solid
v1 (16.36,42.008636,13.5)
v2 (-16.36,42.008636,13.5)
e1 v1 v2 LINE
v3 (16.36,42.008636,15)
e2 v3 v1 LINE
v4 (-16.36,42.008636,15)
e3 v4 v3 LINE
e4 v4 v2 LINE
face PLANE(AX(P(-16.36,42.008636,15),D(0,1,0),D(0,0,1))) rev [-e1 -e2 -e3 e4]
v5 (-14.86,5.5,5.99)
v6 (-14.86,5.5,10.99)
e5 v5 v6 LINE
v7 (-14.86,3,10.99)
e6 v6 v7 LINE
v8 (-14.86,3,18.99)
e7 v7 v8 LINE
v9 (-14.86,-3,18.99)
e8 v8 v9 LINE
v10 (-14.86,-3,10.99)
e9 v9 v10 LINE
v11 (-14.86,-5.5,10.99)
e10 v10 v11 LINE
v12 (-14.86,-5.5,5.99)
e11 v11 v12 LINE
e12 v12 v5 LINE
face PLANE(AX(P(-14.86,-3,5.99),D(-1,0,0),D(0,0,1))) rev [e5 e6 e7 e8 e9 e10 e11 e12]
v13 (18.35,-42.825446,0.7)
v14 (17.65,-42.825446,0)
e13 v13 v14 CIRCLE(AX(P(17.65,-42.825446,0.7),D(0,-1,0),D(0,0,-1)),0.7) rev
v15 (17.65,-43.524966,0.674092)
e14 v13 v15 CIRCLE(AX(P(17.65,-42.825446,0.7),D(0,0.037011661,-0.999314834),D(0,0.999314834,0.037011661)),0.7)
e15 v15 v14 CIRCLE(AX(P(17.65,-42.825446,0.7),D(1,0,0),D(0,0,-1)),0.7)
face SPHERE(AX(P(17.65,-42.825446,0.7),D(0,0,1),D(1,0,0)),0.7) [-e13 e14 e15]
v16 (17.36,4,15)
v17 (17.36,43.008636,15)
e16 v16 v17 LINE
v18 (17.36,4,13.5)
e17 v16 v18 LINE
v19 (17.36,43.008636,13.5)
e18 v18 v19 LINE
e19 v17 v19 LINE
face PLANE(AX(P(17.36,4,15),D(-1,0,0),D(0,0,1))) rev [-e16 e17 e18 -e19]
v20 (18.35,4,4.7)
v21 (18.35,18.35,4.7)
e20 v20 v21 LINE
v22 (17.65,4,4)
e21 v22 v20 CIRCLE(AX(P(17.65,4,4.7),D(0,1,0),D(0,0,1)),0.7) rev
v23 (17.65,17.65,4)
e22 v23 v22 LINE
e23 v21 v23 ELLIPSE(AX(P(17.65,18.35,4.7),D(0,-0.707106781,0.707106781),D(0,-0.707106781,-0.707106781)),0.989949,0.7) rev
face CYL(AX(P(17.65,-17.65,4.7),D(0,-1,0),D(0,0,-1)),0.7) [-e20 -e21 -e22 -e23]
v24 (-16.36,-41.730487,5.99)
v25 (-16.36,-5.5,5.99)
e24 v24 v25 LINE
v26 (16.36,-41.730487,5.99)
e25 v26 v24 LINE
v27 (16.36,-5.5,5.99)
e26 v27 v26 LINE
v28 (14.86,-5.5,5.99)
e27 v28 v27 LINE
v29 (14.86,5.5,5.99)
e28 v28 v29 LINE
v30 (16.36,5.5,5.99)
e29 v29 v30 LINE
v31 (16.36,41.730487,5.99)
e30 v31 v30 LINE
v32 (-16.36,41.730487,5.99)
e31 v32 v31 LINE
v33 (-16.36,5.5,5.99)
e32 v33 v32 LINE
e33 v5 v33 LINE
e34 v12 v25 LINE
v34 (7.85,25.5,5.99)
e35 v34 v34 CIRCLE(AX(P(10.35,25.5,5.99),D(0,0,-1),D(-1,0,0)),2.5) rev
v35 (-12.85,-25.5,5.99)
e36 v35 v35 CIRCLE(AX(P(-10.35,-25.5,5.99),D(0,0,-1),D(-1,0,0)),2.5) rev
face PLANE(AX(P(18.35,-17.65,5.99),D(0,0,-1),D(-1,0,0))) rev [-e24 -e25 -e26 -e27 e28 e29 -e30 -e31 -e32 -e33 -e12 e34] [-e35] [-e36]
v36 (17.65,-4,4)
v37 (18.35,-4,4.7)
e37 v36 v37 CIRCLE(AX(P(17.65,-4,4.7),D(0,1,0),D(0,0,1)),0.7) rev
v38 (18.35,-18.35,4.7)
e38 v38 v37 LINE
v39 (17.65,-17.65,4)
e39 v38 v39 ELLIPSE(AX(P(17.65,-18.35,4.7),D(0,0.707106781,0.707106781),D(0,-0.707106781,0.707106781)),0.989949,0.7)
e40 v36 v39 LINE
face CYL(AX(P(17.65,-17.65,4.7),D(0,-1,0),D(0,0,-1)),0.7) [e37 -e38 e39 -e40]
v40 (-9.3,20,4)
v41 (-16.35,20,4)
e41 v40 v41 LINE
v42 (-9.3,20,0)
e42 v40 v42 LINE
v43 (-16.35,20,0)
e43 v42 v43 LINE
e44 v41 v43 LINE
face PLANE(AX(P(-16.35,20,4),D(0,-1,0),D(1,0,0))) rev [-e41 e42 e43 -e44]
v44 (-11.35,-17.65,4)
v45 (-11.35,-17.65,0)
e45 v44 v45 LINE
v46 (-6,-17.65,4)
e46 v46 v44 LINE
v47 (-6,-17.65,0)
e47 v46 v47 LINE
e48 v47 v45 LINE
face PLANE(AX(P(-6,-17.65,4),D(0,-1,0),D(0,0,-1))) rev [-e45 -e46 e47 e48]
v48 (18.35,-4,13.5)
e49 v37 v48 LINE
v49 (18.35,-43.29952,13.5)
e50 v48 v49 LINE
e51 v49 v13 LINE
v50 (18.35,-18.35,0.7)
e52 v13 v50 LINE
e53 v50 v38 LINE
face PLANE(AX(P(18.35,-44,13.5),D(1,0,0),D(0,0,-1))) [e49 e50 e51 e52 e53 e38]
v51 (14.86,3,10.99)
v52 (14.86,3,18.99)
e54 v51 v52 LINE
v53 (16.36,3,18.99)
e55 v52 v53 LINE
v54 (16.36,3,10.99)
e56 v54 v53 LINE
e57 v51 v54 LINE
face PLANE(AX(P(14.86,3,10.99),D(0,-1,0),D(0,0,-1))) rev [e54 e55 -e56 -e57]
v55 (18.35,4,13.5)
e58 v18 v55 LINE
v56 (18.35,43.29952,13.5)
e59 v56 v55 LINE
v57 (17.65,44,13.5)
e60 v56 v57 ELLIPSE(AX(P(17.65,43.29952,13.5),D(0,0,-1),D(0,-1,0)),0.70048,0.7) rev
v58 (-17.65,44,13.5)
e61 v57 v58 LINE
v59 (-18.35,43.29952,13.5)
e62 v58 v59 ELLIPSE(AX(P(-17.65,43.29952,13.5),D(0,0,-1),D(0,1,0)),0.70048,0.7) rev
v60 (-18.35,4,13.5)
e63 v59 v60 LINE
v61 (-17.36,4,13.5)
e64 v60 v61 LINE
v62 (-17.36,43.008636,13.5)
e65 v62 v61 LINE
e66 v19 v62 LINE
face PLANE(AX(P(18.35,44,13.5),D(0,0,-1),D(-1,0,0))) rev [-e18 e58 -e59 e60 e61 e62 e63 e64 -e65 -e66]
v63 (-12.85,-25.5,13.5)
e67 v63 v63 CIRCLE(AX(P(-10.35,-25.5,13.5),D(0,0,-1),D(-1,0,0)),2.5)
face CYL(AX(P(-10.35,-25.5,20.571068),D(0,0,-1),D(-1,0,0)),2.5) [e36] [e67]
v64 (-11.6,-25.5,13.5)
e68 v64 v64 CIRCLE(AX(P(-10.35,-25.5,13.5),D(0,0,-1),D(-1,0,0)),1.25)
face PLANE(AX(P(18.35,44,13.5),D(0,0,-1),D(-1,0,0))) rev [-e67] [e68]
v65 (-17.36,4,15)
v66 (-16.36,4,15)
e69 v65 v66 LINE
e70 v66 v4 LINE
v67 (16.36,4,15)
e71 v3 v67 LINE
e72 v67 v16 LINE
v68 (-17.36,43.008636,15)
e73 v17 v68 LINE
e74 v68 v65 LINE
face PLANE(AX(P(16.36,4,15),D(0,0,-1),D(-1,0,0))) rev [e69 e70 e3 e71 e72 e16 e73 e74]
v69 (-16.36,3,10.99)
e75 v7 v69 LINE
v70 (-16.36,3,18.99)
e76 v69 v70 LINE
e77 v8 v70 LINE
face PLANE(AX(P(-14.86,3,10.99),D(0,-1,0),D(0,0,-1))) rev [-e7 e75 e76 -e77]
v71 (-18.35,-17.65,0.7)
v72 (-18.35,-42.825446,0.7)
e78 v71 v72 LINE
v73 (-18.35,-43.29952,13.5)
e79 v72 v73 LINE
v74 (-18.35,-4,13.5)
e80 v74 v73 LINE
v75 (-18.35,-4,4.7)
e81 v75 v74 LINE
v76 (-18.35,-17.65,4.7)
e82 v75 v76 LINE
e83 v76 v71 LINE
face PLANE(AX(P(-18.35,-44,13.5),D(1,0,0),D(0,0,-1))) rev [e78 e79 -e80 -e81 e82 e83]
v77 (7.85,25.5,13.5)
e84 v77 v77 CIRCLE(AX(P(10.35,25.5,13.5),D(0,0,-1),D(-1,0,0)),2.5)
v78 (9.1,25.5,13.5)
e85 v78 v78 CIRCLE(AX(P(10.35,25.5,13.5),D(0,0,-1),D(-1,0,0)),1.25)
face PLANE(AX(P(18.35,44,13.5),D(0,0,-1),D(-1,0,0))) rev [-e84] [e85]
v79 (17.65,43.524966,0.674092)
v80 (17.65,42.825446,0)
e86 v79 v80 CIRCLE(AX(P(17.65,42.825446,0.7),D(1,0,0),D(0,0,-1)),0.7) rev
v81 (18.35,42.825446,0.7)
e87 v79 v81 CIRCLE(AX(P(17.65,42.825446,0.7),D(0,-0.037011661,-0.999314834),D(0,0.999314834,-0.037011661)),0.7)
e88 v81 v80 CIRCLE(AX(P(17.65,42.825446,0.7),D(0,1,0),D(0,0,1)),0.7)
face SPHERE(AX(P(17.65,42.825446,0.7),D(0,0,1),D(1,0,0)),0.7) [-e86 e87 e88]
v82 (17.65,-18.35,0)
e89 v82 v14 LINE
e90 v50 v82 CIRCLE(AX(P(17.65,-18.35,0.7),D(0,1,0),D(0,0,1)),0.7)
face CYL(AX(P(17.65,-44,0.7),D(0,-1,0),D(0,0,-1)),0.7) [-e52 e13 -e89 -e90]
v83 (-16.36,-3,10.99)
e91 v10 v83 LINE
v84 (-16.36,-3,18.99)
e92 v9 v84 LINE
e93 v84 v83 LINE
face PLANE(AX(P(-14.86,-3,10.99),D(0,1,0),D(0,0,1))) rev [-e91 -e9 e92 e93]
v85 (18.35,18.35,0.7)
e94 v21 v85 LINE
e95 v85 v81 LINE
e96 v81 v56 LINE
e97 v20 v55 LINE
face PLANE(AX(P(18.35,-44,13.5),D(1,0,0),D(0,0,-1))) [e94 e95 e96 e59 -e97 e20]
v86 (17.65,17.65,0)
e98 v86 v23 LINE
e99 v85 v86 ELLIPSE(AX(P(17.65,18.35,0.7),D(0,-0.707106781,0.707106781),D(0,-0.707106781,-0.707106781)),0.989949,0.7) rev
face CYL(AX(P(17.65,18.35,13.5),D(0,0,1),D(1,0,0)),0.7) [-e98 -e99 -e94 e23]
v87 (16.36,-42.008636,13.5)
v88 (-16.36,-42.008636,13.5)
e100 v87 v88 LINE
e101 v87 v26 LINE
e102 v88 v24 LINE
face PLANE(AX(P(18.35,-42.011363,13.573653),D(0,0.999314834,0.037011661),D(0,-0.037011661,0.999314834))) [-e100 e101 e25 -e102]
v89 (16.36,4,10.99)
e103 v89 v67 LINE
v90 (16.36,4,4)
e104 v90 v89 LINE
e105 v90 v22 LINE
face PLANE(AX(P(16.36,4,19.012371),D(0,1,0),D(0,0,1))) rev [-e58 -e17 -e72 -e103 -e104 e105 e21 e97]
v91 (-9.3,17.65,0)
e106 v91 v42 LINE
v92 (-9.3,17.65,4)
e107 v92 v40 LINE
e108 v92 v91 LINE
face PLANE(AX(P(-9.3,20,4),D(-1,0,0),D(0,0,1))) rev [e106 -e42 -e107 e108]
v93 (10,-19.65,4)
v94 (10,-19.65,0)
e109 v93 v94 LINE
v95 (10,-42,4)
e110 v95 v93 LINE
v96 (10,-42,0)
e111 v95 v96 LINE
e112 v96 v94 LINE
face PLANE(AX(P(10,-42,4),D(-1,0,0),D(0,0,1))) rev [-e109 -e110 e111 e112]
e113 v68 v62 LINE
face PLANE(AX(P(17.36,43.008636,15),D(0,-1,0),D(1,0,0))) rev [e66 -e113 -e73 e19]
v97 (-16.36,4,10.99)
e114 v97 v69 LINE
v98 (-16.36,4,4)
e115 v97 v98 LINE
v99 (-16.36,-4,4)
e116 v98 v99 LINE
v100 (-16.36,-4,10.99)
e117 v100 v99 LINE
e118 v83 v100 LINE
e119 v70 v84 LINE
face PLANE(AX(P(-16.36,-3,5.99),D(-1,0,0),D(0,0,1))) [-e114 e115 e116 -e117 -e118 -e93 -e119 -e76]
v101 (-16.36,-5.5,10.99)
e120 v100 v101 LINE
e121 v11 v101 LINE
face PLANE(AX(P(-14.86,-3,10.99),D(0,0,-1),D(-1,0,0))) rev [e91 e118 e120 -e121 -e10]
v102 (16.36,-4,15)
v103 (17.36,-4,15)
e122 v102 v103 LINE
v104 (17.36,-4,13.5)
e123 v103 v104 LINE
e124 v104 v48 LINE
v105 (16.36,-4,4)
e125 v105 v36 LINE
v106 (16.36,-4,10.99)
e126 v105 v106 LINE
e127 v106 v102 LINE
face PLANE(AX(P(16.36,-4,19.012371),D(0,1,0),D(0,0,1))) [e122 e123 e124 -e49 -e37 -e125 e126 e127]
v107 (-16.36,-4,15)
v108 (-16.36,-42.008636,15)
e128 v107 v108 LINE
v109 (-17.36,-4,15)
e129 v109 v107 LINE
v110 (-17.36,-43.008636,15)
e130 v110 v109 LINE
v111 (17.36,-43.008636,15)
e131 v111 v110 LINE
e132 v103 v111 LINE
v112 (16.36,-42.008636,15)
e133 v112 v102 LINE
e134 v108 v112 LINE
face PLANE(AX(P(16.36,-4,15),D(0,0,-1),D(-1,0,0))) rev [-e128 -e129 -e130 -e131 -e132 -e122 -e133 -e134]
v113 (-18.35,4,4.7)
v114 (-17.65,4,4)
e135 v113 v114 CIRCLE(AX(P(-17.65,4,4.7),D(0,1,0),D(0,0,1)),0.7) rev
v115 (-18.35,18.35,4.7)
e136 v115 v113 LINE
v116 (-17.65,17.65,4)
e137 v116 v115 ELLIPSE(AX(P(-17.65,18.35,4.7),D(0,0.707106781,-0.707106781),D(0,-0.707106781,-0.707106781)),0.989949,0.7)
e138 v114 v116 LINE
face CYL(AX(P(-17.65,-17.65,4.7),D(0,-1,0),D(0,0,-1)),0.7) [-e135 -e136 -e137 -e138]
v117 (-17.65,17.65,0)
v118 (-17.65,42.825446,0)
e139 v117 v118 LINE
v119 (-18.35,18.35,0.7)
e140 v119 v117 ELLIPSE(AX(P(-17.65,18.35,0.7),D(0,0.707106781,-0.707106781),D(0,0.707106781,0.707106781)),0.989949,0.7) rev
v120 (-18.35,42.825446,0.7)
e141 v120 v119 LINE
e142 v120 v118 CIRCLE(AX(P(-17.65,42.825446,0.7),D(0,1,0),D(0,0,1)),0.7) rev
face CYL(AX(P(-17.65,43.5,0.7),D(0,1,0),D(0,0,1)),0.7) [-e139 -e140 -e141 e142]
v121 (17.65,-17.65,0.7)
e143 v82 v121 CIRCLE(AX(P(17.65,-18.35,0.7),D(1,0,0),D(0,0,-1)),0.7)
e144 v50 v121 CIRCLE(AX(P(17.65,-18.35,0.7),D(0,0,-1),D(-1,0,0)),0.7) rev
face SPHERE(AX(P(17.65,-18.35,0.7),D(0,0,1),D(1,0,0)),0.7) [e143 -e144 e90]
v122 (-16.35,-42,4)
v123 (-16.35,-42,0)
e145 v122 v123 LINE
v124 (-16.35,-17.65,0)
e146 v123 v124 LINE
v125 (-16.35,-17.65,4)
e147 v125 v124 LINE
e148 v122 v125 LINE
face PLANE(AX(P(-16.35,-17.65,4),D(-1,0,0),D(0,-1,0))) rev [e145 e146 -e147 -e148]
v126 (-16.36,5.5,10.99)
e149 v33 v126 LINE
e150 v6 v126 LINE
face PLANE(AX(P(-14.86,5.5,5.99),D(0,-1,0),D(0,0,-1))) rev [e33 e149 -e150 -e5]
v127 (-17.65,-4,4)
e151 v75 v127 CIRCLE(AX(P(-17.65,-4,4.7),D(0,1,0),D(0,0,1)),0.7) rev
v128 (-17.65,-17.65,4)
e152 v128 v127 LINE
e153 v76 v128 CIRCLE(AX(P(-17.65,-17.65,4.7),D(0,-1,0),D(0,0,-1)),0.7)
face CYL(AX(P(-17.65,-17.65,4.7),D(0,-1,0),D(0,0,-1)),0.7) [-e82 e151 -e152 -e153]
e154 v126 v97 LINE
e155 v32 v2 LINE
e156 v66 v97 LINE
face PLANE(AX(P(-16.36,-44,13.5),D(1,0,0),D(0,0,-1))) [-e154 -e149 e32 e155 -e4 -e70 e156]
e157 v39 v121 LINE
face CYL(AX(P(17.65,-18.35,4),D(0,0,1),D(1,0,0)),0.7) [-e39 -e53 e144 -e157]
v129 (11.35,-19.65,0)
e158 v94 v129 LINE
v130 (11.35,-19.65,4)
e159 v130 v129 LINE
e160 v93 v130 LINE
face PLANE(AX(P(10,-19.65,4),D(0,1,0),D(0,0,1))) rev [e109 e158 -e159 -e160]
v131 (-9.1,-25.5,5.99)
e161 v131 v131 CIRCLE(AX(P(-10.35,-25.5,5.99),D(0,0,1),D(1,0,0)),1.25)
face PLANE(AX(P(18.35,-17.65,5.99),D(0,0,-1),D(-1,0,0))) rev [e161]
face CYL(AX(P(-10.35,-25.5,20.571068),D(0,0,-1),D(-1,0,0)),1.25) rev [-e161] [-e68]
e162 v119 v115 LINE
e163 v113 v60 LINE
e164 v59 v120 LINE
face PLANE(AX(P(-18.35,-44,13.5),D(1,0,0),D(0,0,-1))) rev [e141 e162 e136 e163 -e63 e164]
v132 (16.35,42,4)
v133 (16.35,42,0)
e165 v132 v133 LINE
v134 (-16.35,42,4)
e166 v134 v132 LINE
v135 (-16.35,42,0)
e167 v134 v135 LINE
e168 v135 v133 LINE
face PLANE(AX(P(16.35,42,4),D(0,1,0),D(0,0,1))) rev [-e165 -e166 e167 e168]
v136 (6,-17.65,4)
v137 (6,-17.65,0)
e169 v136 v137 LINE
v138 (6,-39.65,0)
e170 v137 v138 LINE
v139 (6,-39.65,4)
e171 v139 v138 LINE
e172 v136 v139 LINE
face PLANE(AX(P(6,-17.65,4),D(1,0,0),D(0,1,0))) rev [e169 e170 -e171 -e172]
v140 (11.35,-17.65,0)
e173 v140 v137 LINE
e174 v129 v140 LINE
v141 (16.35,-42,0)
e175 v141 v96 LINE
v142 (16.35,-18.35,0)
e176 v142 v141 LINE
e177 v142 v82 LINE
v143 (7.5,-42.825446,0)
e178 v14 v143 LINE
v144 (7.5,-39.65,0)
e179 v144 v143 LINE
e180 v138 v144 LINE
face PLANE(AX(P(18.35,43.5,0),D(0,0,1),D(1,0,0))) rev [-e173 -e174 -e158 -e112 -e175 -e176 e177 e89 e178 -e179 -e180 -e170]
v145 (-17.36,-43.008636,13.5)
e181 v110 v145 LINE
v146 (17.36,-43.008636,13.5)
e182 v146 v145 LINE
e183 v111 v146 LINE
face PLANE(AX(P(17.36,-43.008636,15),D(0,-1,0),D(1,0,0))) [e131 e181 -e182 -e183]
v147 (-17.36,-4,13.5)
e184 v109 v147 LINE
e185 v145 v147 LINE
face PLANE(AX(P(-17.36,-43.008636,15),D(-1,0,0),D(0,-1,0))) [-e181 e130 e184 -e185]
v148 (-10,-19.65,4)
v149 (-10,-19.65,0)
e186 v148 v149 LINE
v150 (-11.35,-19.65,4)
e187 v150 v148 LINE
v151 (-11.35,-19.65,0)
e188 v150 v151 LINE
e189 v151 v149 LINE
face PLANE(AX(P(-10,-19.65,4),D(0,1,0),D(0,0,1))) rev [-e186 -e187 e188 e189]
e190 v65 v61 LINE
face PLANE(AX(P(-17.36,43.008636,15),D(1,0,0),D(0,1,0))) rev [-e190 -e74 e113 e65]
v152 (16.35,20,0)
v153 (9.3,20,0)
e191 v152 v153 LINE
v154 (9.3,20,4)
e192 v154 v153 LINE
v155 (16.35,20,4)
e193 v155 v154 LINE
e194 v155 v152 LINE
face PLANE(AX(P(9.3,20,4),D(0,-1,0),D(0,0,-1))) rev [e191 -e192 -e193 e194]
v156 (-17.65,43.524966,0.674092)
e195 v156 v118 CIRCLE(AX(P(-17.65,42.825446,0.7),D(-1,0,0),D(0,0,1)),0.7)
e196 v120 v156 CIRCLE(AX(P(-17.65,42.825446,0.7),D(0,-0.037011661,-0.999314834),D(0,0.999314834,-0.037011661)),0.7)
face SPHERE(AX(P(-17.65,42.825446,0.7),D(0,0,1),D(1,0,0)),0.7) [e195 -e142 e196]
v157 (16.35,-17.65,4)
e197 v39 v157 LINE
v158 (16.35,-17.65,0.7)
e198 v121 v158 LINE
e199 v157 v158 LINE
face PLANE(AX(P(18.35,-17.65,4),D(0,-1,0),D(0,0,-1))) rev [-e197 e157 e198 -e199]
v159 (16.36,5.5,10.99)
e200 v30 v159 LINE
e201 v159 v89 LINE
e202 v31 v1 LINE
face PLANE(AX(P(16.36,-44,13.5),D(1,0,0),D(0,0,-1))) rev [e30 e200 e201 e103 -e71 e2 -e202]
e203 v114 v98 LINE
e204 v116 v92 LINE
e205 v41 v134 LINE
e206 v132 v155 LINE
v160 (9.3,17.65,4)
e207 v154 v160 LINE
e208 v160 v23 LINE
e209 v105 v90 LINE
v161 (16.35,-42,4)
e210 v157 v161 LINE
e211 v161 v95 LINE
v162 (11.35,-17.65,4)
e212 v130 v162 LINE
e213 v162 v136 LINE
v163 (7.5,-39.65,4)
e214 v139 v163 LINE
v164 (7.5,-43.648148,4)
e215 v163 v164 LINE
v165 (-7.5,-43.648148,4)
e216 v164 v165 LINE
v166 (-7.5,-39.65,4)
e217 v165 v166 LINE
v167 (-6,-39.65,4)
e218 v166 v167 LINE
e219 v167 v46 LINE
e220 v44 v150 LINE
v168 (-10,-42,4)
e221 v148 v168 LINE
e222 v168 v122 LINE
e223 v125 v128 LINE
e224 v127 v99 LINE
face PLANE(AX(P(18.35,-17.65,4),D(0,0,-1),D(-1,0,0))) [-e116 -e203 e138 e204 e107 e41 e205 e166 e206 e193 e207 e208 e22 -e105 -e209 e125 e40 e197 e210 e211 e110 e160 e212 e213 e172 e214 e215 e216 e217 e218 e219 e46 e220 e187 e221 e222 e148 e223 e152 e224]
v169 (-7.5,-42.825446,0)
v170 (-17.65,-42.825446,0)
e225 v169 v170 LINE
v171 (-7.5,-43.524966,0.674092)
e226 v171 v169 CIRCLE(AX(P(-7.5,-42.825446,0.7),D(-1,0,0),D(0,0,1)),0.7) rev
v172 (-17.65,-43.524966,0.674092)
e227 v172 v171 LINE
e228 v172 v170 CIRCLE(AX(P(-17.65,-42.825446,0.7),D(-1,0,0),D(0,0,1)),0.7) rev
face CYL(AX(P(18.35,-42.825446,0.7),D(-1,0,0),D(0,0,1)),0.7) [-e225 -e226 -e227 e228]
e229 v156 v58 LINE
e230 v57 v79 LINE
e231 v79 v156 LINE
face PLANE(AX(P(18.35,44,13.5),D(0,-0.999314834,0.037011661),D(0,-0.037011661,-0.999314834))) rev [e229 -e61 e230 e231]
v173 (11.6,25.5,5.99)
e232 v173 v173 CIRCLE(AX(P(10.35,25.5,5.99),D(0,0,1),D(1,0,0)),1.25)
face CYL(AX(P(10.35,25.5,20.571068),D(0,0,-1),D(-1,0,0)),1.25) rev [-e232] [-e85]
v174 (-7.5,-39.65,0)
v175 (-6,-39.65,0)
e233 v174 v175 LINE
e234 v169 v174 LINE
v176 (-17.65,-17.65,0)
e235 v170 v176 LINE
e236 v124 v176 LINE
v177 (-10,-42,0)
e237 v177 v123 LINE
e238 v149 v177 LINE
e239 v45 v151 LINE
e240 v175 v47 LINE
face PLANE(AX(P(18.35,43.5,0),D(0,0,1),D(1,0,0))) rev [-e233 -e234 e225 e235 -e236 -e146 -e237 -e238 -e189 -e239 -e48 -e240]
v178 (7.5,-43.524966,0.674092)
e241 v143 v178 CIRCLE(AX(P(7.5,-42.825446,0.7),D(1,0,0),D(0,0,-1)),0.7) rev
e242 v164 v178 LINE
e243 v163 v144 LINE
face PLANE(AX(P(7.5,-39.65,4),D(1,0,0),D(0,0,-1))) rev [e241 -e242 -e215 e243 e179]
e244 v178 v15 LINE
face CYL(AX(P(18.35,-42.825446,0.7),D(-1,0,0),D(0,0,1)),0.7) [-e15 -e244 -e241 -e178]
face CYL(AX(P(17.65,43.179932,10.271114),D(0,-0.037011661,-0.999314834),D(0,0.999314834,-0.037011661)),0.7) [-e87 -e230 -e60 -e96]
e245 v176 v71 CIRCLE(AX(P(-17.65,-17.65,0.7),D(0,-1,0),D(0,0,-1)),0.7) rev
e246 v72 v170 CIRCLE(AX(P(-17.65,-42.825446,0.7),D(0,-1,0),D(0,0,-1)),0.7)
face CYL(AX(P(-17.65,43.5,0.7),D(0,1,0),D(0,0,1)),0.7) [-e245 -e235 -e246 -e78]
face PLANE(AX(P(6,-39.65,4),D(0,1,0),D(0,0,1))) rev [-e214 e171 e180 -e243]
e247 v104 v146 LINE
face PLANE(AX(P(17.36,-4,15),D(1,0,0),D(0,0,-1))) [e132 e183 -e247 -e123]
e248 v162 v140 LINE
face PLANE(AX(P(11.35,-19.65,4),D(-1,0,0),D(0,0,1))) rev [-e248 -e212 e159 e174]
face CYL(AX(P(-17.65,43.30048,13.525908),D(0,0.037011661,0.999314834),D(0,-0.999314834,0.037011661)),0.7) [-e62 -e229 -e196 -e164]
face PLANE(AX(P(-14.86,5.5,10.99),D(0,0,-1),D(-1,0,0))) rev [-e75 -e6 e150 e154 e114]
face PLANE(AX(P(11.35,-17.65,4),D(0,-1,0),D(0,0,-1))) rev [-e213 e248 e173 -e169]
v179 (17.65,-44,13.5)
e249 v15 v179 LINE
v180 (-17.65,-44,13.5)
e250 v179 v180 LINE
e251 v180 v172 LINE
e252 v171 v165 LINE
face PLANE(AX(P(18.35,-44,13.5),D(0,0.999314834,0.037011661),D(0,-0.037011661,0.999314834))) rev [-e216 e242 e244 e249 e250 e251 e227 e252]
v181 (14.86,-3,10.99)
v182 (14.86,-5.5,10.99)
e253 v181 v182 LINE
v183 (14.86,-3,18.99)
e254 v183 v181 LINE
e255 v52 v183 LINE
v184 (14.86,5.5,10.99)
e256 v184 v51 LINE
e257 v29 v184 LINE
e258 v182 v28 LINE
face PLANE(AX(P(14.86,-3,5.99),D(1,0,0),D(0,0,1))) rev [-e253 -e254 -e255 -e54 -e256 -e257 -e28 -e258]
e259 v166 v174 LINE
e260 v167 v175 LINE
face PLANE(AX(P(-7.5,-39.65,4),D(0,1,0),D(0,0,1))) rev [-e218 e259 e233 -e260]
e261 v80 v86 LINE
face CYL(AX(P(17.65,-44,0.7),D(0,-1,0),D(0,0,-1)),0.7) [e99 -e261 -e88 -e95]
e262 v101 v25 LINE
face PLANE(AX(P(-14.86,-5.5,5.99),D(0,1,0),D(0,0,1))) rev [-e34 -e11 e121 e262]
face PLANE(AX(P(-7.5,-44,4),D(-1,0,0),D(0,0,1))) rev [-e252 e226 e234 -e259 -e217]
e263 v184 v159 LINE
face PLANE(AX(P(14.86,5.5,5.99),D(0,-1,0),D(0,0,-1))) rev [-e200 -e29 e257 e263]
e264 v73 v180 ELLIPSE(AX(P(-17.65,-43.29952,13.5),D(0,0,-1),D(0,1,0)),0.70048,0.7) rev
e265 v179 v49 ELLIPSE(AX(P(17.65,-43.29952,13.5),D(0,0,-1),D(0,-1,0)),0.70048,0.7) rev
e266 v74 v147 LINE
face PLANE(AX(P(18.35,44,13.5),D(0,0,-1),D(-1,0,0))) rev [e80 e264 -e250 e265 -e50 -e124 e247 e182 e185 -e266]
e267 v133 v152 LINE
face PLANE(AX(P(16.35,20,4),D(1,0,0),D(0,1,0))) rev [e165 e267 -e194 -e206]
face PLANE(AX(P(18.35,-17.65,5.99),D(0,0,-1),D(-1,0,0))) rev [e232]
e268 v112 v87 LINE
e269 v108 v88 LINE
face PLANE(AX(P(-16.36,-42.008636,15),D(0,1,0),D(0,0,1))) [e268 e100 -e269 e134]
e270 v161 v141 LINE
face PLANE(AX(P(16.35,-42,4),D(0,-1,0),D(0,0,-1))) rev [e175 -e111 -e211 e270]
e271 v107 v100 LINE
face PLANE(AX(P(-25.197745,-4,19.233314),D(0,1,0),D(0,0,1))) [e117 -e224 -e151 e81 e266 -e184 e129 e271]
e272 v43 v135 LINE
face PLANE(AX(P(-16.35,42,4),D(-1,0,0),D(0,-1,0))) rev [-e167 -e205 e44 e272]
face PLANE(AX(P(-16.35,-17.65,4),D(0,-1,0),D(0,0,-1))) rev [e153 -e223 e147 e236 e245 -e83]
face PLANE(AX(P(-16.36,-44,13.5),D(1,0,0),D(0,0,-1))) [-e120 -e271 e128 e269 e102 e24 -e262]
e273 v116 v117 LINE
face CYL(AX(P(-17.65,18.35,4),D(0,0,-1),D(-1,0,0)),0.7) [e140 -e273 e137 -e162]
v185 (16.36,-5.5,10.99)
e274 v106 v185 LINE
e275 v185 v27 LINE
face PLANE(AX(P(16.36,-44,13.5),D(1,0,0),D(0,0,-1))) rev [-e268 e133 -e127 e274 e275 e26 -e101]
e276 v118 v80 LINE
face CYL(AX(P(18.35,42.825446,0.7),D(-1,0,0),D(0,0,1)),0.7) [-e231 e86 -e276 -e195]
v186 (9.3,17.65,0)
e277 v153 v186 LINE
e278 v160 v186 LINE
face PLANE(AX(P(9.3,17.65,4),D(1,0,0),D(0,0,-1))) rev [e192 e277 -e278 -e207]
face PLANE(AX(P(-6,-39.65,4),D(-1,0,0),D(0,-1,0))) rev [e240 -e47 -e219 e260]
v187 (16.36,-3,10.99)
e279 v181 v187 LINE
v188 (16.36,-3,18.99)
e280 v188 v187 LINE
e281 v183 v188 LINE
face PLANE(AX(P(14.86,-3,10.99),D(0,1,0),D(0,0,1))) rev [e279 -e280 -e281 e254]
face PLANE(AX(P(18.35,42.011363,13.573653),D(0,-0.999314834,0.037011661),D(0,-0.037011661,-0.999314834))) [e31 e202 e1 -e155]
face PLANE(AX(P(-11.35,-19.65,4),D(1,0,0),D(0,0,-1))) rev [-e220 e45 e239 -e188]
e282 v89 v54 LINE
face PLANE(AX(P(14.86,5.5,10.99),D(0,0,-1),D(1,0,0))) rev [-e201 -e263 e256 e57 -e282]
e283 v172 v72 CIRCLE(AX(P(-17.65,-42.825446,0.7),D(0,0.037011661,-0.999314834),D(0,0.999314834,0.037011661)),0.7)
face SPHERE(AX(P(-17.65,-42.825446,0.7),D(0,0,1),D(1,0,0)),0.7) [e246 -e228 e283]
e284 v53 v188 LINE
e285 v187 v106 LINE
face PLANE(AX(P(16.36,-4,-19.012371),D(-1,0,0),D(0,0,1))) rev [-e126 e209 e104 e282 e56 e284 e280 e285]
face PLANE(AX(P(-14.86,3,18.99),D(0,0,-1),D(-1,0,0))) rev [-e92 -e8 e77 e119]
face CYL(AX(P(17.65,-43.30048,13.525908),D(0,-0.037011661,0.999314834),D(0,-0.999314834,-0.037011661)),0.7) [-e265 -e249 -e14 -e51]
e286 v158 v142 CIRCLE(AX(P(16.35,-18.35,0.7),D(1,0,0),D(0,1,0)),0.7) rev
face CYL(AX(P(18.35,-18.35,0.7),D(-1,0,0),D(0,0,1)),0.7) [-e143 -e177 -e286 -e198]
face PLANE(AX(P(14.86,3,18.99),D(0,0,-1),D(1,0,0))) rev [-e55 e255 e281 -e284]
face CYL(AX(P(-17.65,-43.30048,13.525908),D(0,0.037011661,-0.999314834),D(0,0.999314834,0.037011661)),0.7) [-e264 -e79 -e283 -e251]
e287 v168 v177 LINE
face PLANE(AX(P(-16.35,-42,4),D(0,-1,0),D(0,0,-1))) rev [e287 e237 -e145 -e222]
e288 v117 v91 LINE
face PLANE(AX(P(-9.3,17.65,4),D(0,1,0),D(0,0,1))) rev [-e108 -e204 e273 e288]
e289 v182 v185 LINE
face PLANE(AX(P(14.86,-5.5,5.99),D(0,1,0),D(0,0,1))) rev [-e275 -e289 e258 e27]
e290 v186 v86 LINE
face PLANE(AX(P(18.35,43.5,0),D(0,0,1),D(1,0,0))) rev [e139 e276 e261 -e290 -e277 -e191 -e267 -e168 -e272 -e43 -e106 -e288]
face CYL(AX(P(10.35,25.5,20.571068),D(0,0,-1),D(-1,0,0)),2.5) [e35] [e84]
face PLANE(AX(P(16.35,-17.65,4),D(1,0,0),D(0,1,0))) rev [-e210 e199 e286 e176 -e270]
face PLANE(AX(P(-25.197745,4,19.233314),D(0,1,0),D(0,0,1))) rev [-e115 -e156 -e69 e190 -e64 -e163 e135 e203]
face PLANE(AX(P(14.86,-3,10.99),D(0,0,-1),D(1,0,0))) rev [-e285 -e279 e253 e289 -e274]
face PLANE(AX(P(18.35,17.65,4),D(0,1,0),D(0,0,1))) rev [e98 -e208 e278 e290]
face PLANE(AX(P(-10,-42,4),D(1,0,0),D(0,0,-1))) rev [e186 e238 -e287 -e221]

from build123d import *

# Parameters (mm, degrees)
EXTRUDE_1_DEPTH     = 18.35
CUT_EXTRUDE_1_DEPTH = 4
SHELL_START         = -16.36
SHELL_1_DEPTH       = 32.72
SKETCH_8_R          = 2.5
SKETCH_8_R_2        = 1.25
EXTRUDE_4_DEPTH     = 7.51
FILLET_1_R          = 0.7
SKETCH_10_W         = 8.837744534
SKETCH_10_H         = 38.466628308
SKETCH_10_W_2       = 9.721518987
SKETCH_10_H_2       = 38.024741082
CUT_EXTRUDE_2_DEPTH = 4
EXTRUDE_5_DEPTH     = 1.5
EXTRUDE_6_DEPTH     = 1.5


# Read off the part's stored shape, not the designer's step: Оболочка1
with BuildPart() as part:
    # Эскиз1 → Вытянуть1 (new, symmetric)
    with BuildSketch(Plane(origin=(0, 0, 0), x_dir=(0, 0, -1), z_dir=(1, 0, 0))):
        Polygon((-13.5, 44), (0, 43.5), (0, -43.5), (-13.5, -44), align=None)
    extrude(amount=EXTRUDE_1_DEPTH, both=True)

    # Эскиз2 → Вырез-Вытянуть1 (cut)
    with BuildSketch(Plane(origin=(0, 0, 0), x_dir=(-1, 0, 0), z_dir=(0, 0, -1))):
        Polygon((-18.35, 17.65), (-9.3, 17.65), (-9.3, 20), (-16.35, 20), (-16.35, 42), (16.35, 42), (16.35, 20), (9.3, 20), (9.3, 17.65), (18.35, 17.65), (18.35, -17.65), (16.35, -17.65), (16.35, -42), (10, -42), (10, -19.65), (11.35, -19.65), (11.35, -17.65), (6, -17.65), (6, -39.65), (7.5, -39.65), (7.5, -44), (-7.5, -44), (-7.5, -39.65), (-6, -39.65), (-6, -17.65), (-11.35, -17.65), (-11.35, -19.65), (-10, -19.65), (-10, -42), (-16.35, -42), (-16.35, -17.65), (-18.35, -17.65), align=None)
    extrude(amount=-CUT_EXTRUDE_1_DEPTH, mode=Mode.SUBTRACT)

    # Оболочка1 outline → Оболочка1 (cut)
    with BuildSketch(Plane.YZ.offset(SHELL_START)):
        Polygon((-42.008635584, 13.5), (-41.730487436, 5.99), (41.730487436, 5.99), (42.008635584, 13.5), align=None)
    extrude(amount=SHELL_1_DEPTH, mode=Mode.SUBTRACT)

    # Эскиз8 → Вытянуть4 (add)
    # profile 1 of 2: a face of its own
    with BuildSketch(Plane.XY.offset(5.99)):
        with Locations(Location((10.35, 25.5, 0), (0, 0, 180))):
            Circle(SKETCH_8_R)
        with Locations(Location((10.35, 25.5, 0), (0, 0, 180))):
            Circle(SKETCH_8_R_2, mode=Mode.SUBTRACT)
    # profile 2 of 2: a face of its own
    with BuildSketch(Plane.XY.offset(5.99)):
        with Locations(Location((-10.35, -25.5, 0), (0, 0, 180))):
            Circle(SKETCH_8_R)
        with Locations(Location((-10.35, -25.5, 0), (0, 0, 180))):
            Circle(SKETCH_8_R_2, mode=Mode.SUBTRACT)
    extrude(amount=EXTRUDE_4_DEPTH)

    # Скругление1
    fillet_1_edges = [part.edges().sort_by_distance(p)[0] for p in [
        (17.35, -17.65, 0),
        (-18.35, -43.75, 6.75),
        (-18.35, -30.575, 0),
        (-18.35, 0, 4),
        (-18.35, 30.575, 0),
        (18.35, -43.75, 6.75),
        (18.35, -30.575, 0),
        (18.35, -17.65, 2),
        (18.35, 0, 4),
        (18.35, 17.65, 2),
        (18.35, 30.575, 0),
        (-18.35, 43.75, 6.75),
        (0, 43.5, 0),
        (18.35, 43.75, 6.75),
        (-12.925, -43.5, 0),
        (12.925, -43.5, 0),
        (-18.35, 17.65, 2),
    ]]
    fillet(fillet_1_edges, radius=FILLET_1_R)

    # Эскиз10 → Вырез-Вытянуть2 (cut, symmetric)
    with BuildSketch(Plane(origin=(0, 0, 0), x_dir=(1, 0, 0), z_dir=(0, 1, 0))):
        with Locations((-20.778872267, 0)):
            Rectangle(SKETCH_10_W, SKETCH_10_H)
        with Locations((21.220759494, 0)):
            Rectangle(SKETCH_10_W_2, SKETCH_10_H_2)
    extrude(amount=CUT_EXTRUDE_2_DEPTH, both=True, mode=Mode.SUBTRACT)


with BuildPart() as body_2:
    # Эскиз11 → Вытянуть5 (new body)
    with BuildSketch(Plane(origin=(-16.36, 0, 0), x_dir=(0, 0, -1), z_dir=(1, 0, 0))):
        Polygon((-5.99, 5.5), (-10.99, 5.5), (-10.99, 3), (-18.99, 3), (-18.99, -3), (-10.99, -3), (-10.99, -5.5), (-5.99, -5.5), align=None)
    extrude_5 = extrude(amount=EXTRUDE_5_DEPTH)



with BuildPart() as part_1:
    add(part.part)

    # Зеркальное отражение2: Вытянуть5 across plane
    add(extrude_5.mirror(Plane(origin=(0, 0, 0), x_dir=(0, 0, 1), z_dir=(1, 0, 0))))


with BuildPart() as body_2_1:
    add(body_2.part)

    add(part_1.part)  # Вытянуть6 merges part
    # Эскиз12 → Вытянуть6 (add)
    with BuildSketch(Plane.XY.offset(13.5)):
        Polygon((-16.36, 4), (-16.36, 42.008635584), (16.36, 42.008635584), (16.36, 4), (17.36, 4), (17.36, 43.008635584), (-17.36, 43.008635584), (-17.36, 4), align=None)
    extrude_6 = extrude(amount=EXTRUDE_6_DEPTH)

    # Зеркальное отражение3: Вытянуть6 across plane
    add(extrude_6.mirror(Plane.ZX))


solid = body_2_1.part
